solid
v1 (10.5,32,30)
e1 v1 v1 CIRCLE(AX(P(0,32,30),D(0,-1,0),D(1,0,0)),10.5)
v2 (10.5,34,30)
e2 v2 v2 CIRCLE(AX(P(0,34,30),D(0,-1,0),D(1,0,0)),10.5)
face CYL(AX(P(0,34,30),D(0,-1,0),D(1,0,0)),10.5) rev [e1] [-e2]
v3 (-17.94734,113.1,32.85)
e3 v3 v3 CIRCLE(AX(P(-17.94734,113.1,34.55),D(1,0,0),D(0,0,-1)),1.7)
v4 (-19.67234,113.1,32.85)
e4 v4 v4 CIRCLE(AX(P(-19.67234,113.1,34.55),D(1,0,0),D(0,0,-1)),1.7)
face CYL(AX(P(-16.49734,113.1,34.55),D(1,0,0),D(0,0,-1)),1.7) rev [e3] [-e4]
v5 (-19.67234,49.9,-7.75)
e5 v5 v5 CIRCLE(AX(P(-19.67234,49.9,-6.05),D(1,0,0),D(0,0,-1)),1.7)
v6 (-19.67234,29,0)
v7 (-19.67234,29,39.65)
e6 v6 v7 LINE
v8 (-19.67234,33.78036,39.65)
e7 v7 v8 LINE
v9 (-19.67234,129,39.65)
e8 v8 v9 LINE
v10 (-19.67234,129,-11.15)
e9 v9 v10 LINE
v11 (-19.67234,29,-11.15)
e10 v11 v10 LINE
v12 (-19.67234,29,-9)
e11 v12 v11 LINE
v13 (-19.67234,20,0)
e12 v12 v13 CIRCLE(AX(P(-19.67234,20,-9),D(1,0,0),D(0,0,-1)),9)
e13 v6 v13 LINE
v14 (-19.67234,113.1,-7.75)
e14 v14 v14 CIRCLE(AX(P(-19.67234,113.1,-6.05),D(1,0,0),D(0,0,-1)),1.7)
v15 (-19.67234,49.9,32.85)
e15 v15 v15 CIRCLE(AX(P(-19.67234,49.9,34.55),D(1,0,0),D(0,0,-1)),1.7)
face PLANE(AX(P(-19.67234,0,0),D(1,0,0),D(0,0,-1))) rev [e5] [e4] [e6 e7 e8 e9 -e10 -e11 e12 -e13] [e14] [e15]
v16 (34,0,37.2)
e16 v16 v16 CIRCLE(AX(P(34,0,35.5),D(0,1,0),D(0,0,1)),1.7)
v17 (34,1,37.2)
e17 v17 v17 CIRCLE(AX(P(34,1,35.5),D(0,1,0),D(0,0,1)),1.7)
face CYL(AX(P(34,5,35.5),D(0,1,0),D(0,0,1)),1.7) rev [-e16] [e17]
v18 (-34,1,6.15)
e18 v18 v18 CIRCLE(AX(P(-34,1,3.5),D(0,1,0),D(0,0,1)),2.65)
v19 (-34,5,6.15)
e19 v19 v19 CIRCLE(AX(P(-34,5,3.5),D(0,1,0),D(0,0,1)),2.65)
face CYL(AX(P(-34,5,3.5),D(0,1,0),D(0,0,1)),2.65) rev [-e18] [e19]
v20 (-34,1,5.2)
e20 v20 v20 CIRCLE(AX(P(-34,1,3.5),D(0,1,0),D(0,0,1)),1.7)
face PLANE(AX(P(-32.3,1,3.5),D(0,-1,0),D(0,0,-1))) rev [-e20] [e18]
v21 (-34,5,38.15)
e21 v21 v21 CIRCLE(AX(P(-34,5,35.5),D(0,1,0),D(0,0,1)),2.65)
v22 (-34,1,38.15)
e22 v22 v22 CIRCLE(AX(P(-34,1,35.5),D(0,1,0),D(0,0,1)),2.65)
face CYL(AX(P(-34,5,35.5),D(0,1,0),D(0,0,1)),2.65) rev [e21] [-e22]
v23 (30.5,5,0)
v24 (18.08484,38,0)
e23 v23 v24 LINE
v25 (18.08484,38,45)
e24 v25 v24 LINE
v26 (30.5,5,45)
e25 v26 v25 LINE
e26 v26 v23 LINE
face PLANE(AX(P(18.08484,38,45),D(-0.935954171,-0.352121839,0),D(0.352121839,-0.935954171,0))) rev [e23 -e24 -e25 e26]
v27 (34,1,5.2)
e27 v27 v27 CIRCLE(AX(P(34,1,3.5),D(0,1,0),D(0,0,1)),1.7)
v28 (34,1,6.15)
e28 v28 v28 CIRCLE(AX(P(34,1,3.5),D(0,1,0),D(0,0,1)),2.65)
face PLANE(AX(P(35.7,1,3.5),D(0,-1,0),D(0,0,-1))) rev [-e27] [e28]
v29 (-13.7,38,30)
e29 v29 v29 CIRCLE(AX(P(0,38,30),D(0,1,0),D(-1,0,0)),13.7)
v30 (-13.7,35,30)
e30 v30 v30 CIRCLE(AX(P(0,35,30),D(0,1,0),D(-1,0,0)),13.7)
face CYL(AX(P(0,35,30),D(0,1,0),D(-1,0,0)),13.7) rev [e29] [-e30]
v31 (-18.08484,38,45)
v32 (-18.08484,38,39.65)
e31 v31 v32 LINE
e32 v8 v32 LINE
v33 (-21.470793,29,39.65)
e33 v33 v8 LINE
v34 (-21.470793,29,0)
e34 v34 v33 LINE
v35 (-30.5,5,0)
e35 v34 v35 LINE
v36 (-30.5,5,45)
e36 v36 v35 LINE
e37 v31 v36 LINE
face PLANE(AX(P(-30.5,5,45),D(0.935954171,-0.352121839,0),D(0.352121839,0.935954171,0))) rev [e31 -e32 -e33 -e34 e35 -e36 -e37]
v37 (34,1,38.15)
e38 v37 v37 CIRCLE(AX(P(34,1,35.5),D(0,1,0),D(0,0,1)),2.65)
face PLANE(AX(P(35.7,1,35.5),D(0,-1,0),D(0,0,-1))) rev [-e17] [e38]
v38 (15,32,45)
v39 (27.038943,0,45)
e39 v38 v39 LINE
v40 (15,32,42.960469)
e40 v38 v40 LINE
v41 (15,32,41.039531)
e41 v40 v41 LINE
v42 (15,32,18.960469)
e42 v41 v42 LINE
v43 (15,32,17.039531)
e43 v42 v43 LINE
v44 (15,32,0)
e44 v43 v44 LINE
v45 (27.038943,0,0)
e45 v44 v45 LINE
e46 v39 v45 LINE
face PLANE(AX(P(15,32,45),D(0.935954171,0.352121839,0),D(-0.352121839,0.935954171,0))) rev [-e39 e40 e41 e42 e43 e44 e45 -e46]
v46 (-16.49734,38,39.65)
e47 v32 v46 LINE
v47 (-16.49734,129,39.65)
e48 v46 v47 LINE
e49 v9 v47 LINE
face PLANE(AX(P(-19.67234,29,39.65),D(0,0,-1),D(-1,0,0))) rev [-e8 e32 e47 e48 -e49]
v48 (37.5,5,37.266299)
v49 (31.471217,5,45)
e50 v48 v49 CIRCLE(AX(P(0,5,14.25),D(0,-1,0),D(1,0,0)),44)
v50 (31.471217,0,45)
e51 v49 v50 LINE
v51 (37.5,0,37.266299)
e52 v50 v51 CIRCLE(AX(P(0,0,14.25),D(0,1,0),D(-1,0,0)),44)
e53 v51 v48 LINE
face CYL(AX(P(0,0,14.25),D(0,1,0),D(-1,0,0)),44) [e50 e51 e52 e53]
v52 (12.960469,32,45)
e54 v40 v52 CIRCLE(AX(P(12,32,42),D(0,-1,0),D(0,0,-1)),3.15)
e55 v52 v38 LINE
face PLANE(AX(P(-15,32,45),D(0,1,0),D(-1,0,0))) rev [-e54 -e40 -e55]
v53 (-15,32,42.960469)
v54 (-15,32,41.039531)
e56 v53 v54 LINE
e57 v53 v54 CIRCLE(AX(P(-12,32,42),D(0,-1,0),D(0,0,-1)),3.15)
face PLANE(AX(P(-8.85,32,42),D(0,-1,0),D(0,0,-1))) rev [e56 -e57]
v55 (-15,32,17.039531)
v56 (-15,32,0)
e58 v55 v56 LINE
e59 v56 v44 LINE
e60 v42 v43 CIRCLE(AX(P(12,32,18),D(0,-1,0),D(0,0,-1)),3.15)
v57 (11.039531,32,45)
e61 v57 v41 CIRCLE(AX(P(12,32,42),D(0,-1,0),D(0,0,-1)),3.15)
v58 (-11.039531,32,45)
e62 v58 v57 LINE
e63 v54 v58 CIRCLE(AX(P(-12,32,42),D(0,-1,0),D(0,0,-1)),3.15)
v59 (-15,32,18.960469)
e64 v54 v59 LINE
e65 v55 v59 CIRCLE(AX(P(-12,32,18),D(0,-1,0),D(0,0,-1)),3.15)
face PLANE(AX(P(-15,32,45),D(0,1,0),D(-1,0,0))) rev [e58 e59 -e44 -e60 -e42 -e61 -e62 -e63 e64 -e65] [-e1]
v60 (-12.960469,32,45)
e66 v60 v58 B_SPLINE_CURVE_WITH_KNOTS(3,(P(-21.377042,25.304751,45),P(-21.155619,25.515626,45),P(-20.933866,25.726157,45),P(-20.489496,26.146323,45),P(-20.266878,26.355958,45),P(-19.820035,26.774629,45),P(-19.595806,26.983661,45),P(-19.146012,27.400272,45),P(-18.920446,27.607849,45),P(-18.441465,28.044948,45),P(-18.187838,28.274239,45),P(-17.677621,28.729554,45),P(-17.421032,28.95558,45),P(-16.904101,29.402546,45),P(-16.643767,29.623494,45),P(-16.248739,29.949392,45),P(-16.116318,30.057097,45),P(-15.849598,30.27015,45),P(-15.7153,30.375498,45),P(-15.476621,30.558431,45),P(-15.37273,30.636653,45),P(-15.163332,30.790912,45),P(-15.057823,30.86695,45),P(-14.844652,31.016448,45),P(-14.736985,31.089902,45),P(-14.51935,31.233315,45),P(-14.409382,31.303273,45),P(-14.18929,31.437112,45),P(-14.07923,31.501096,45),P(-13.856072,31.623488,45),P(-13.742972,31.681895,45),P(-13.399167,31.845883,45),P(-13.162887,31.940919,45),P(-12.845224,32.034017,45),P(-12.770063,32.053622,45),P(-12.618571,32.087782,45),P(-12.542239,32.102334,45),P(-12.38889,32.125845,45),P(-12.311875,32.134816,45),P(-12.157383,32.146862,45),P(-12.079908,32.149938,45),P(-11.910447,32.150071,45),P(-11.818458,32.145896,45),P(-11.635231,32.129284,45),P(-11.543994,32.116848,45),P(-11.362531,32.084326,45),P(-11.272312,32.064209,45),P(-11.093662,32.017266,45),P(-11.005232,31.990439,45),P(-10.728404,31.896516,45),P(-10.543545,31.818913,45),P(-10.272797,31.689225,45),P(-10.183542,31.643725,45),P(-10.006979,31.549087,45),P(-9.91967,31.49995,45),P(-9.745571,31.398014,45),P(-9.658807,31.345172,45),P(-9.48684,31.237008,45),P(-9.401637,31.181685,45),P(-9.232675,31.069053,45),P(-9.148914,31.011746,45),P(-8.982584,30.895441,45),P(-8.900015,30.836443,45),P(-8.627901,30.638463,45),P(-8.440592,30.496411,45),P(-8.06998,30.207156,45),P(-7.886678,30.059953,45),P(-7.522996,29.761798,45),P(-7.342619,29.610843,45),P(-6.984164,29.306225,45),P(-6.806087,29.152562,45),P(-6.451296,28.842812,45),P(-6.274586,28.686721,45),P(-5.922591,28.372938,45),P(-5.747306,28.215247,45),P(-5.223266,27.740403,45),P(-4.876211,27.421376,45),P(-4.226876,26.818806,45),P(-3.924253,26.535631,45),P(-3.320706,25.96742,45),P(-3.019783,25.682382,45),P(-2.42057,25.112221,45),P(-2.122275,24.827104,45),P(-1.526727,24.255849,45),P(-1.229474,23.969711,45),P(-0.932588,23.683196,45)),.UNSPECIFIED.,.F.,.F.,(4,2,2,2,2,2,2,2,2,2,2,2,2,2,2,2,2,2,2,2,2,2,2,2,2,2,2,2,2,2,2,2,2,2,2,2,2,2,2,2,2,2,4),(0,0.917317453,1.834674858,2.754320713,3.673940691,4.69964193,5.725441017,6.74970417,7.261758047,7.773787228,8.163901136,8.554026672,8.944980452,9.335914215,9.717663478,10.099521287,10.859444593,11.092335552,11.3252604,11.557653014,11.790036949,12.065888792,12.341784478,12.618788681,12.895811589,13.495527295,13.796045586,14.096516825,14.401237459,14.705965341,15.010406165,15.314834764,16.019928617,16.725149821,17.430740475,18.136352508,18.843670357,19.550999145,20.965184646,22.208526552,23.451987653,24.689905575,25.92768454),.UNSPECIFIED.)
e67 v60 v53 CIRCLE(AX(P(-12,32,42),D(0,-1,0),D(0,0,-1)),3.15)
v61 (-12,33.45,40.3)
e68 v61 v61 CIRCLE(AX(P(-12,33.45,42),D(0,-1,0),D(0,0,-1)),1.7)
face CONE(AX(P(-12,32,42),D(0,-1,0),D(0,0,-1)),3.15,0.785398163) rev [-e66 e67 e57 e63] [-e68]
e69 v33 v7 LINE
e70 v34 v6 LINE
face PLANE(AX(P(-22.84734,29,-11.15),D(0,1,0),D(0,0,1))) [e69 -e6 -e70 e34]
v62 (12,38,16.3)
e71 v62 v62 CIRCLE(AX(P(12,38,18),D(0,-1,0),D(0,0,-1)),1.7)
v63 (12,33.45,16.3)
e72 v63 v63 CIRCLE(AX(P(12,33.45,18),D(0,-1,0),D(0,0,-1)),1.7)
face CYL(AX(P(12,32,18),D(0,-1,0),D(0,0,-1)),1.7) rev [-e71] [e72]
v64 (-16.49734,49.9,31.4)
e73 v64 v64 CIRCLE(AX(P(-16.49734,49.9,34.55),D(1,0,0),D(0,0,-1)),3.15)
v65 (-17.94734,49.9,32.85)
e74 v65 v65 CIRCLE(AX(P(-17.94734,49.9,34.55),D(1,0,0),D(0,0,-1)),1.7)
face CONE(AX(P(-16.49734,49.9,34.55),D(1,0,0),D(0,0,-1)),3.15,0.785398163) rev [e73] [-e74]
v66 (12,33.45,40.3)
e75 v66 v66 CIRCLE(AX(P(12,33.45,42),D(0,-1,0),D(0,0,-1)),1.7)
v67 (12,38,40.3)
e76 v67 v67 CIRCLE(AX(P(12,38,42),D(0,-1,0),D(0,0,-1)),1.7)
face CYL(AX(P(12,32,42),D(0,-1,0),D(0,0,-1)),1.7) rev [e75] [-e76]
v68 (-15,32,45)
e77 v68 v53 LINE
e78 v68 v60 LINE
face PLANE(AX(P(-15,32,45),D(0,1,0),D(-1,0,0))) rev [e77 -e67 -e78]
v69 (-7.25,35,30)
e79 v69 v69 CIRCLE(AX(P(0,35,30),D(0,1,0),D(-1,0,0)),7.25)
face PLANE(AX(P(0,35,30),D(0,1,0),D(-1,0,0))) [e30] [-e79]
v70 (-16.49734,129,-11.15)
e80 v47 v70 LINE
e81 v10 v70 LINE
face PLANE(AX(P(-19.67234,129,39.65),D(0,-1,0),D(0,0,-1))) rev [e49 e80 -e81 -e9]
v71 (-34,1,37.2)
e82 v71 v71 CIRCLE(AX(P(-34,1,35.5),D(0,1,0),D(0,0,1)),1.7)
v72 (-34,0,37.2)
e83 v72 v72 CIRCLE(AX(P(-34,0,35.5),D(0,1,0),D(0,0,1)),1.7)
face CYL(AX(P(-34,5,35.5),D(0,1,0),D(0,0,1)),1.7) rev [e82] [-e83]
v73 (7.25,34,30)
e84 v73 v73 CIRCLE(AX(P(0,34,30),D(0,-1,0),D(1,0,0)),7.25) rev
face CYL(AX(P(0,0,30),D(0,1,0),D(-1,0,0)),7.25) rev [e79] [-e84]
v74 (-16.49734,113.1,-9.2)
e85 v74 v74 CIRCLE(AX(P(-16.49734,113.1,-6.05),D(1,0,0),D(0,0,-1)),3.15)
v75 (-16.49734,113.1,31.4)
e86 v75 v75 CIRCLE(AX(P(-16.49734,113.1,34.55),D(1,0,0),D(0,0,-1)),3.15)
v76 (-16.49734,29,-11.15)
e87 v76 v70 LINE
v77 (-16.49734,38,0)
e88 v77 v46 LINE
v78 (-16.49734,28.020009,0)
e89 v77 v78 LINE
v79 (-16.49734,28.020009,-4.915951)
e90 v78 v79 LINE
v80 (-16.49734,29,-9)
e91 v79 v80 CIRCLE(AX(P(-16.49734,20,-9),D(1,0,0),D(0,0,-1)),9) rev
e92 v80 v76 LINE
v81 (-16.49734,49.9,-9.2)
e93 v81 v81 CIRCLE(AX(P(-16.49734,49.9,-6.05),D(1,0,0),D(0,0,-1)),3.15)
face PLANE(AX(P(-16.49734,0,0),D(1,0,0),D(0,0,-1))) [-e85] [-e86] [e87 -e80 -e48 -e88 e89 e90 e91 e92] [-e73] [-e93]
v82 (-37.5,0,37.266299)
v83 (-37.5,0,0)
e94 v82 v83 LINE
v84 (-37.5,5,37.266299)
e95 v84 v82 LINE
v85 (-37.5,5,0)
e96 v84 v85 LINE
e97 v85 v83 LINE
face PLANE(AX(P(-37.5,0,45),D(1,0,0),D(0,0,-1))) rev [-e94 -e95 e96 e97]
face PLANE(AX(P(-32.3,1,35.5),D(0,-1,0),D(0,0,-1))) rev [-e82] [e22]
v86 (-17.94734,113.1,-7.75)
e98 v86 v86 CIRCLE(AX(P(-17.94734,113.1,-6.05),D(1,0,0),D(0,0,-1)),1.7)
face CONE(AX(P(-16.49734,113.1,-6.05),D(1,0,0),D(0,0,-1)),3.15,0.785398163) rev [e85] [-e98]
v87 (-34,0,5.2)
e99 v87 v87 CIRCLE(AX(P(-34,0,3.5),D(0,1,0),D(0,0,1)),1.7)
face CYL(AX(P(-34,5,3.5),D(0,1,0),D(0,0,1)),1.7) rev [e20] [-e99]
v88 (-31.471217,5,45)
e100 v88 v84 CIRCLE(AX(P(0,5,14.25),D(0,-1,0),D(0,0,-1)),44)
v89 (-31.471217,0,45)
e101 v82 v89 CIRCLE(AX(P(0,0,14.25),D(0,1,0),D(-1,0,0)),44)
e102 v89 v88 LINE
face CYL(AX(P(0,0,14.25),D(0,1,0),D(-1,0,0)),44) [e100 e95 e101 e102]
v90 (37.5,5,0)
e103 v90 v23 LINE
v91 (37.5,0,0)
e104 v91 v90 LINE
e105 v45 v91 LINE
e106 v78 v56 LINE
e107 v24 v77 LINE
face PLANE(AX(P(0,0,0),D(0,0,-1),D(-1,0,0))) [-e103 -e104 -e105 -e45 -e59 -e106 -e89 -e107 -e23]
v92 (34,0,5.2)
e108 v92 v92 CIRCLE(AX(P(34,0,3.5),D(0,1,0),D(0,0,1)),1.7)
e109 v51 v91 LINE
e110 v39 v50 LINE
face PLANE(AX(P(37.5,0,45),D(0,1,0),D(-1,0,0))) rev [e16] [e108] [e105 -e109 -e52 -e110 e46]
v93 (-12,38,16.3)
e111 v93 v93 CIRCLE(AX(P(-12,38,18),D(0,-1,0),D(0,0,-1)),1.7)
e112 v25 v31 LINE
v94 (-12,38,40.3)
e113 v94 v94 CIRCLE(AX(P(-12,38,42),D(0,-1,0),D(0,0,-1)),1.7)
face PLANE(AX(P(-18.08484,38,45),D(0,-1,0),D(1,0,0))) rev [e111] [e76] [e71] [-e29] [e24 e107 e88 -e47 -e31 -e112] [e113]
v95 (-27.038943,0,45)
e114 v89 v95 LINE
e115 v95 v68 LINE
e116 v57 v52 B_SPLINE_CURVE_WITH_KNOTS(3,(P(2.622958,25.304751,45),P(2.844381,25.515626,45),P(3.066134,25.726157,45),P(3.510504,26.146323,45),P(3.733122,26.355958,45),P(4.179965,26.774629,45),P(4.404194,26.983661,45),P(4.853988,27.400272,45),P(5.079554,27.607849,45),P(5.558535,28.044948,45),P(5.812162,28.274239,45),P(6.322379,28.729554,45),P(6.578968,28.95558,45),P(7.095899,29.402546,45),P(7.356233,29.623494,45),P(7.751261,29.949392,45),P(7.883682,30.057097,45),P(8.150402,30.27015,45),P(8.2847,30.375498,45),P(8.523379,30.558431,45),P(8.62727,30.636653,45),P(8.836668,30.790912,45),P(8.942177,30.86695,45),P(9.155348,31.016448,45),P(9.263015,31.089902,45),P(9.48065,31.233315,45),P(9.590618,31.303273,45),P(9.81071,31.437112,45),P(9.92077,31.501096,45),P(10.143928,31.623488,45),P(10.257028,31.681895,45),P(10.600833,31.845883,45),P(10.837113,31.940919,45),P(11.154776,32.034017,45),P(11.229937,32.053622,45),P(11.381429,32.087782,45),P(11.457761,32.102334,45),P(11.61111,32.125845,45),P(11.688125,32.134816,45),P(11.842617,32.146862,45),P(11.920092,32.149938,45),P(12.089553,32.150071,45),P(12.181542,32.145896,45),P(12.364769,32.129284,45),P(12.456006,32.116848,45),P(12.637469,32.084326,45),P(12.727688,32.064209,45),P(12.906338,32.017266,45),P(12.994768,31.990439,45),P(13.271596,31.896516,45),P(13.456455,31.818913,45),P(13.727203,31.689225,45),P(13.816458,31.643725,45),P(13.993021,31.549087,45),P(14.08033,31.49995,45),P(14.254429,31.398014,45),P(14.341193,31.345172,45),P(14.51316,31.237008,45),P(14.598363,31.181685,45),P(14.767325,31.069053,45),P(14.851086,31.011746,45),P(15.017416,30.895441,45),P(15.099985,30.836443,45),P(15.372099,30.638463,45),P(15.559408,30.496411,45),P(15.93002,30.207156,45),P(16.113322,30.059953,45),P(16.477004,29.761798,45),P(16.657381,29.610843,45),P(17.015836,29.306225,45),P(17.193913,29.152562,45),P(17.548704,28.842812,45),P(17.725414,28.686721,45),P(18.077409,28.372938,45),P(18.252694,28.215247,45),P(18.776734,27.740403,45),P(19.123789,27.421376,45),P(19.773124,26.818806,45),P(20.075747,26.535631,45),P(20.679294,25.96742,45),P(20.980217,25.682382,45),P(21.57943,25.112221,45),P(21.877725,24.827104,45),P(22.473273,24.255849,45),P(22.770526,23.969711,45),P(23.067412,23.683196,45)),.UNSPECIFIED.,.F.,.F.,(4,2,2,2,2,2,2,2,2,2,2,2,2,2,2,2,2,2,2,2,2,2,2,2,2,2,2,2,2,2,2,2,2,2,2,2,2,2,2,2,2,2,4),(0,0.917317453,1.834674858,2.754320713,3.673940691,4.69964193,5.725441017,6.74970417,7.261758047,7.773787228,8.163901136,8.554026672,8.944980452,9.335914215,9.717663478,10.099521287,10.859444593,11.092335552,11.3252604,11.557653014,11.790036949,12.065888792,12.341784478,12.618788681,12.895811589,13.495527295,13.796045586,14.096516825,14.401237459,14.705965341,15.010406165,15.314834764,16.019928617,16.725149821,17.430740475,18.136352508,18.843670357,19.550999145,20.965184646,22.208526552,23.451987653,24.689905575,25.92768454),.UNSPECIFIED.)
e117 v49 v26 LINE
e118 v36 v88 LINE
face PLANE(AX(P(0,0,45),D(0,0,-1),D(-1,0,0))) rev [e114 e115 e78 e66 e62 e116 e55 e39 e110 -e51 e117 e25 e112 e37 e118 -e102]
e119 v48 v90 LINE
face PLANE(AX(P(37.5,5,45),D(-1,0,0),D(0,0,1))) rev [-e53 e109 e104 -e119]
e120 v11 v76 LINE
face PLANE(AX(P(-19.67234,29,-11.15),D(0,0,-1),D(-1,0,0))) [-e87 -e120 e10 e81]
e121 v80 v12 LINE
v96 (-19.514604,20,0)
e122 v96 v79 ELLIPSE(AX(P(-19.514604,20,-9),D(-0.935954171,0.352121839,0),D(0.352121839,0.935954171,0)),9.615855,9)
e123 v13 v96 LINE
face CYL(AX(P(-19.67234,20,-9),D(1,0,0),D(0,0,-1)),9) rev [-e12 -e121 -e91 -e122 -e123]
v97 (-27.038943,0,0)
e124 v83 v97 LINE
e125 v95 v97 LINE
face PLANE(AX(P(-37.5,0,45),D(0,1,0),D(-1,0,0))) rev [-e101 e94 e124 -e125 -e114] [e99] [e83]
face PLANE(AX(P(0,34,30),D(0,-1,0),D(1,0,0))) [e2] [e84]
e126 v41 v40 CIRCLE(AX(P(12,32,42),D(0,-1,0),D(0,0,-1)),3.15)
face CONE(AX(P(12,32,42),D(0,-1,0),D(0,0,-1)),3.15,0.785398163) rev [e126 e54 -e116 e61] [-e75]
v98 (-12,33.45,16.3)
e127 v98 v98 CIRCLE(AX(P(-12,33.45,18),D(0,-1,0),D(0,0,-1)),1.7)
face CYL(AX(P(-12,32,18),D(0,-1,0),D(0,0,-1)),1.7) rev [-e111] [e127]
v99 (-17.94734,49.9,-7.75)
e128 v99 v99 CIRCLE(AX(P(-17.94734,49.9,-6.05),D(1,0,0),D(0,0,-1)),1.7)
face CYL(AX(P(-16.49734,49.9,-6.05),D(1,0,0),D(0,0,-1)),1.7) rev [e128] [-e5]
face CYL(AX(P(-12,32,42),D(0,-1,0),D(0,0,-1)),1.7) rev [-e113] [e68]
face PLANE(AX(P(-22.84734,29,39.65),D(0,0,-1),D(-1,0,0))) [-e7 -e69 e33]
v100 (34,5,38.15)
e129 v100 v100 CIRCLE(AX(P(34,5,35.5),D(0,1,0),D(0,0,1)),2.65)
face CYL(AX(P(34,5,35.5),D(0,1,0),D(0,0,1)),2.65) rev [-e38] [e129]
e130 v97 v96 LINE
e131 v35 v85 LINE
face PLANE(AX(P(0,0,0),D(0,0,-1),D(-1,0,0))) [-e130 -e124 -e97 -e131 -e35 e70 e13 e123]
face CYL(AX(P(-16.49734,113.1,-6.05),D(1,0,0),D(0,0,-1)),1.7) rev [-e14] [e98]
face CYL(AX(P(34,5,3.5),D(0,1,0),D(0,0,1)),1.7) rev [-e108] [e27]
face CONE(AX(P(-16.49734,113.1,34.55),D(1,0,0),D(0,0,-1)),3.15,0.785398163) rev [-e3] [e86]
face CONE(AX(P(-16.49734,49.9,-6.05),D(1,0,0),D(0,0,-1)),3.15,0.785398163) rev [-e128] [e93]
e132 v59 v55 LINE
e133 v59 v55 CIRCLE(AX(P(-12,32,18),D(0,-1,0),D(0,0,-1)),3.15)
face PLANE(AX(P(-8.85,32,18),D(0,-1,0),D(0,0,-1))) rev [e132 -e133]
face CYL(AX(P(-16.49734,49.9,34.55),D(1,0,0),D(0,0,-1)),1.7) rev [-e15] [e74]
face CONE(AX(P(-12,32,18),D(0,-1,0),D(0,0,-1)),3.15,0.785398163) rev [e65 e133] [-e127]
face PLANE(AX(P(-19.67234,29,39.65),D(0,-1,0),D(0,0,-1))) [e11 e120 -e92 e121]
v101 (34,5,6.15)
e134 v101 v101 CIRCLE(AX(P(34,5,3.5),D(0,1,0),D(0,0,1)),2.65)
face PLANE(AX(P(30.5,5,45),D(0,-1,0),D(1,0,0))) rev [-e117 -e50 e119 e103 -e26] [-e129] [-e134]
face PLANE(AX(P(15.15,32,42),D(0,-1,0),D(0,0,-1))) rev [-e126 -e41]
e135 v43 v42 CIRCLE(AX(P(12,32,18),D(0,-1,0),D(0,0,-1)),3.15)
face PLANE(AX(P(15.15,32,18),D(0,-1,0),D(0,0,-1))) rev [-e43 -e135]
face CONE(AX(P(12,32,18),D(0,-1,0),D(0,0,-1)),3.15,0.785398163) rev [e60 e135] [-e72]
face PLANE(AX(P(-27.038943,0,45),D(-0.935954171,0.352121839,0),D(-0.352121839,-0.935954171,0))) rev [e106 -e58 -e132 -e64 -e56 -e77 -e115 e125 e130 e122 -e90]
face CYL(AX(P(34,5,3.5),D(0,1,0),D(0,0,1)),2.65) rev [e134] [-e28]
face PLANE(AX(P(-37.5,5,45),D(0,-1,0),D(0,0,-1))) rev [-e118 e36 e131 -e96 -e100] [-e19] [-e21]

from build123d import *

# Parameters (mm, degrees)
BOSS_EXTRUDE1_DEPTH                             = 45
SKETCH3_R                                       = 13.7
CUT_EXTRUDE1_DEPTH                              = 3
CSK_FOR_M3_FLAT_HEAD_MACHINE_SCREW4_AT_2_COUNT  = 2
CSK_FOR_M3_FLAT_HEAD_MACHINE_SCREW4_AT_2_PITCH  = 24
CSK_FOR_M3_FLAT_HEAD_MACHINE_SCREW4_AT_3_COUNT  = 2
CSK_FOR_M3_FLAT_HEAD_MACHINE_SCREW4_AT_3_PITCH  = 33.941125497
CSK_FOR_M3_FLAT_HEAD_MACHINE_SCREW4_AT_4_COUNT  = 2
CSK_FOR_M3_FLAT_HEAD_MACHINE_SCREW4_AT_4_PITCH  = 24
SKETCH10_R                                      = 7.25
CUT_EXTRUDE2_DEPTH                              = 69.23672032
SKETCH15_R                                      = 48.495489481
SKETCH15_R_2                                    = 44
CUT_EXTRUDE4_DEPTH                              = 70.822990483
SKETCH11_R                                      = 10.5
CUT_EXTRUDE3_DEPTH                              = 2
CBORE_FOR_M5_HEX_HEAD_BOLT1_D                   = 3.4
CBORE_FOR_M5_HEX_HEAD_BOLT1_CBORE_D             = 5.3
CBORE_FOR_M5_HEX_HEAD_BOLT1_CBORE_DEPTH         = 4
BOSS_EXTRUDE6_DEPTH                             = 1.5875
BOSS_EXTRUDE6_DEPTH_BACK                        = 1.5875
SKETCH28_W                                      = 50.8
SKETCH28_H                                      = 100
FILLET4_R                                       = 9
CSK_FOR_M3_FLAT_HEAD_MACHINE_SCREW3_D           = 3.4
CSK_FOR_M3_FLAT_HEAD_MACHINE_SCREW3_CSINK_D     = 6.3
CSK_FOR_M3_FLAT_HEAD_MACHINE_SCREW3_CSINK_ANGLE = 90
SKETCH32_W                                      = 50.8
SKETCH32_H                                      = 4.780360426
CUT_EXTRUDE5_DEPTH                              = 3.175


with BuildPart() as part:
    # Sketch1 → Boss-Extrude1 (new body)
    with BuildSketch(Plane.XY):
        Polygon((-37.5, 0), (-27.038942926, 0), (-15, 32), (15, 32), (27.038942926, 0), (37.5, 0), (37.5, 5), (30.5, 5), (18.084840108, 38), (-18.084840108, 38), (-30.5, 5), (-37.5, 5), align=None)
    extrude(amount=BOSS_EXTRUDE1_DEPTH)

    # Sketch3 → Cut-Extrude1 (cut)
    with BuildSketch(Plane(origin=(0, 38, 0), x_dir=(1, 0, 0), z_dir=(0, 1, 0))):
        with Locations(Location((0, -30, 0), (0, 0, 180))):
            Circle(SKETCH3_R)
    extrude(amount=-CUT_EXTRUDE1_DEPTH, mode=Mode.SUBTRACT)

    # Sketch6 → CSK for M3 Flat Head Machine Screw4 (revolve, cut)
    with BuildSketch(Plane(origin=(-12, 32, 42), x_dir=(0, 0, -1), z_dir=(1, 0, 0))):
        Polygon((0, 0), (0, 6), (1.7, 6), (1.7, 1.45), (3.15, 0), align=None)
    csk_for_m3_flat_head_machine_screw4 = revolve(axis=Axis((-12, 25.65, 42), (0, 1, 0)), mode=Mode.SUBTRACT)

    # CSK for M3 Flat Head Machine Screw4 at 2: CSK for M3 Flat Head Machine Screw4 ×2
    with Locations(*[(i * CSK_FOR_M3_FLAT_HEAD_MACHINE_SCREW4_AT_2_PITCH, 0, 0) for i in range(1, CSK_FOR_M3_FLAT_HEAD_MACHINE_SCREW4_AT_2_COUNT)]):
        add(csk_for_m3_flat_head_machine_screw4, mode=Mode.SUBTRACT)

    # CSK for M3 Flat Head Machine Screw4 at 3: CSK for M3 Flat Head Machine Screw4 ×2
    with Locations(*[Vector(0.7071067811865476, 0, -0.7071067811865475) * (i * CSK_FOR_M3_FLAT_HEAD_MACHINE_SCREW4_AT_3_PITCH) for i in range(1, CSK_FOR_M3_FLAT_HEAD_MACHINE_SCREW4_AT_3_COUNT)]):
        add(csk_for_m3_flat_head_machine_screw4, mode=Mode.SUBTRACT)

    # CSK for M3 Flat Head Machine Screw4 at 4: CSK for M3 Flat Head Machine Screw4 ×2
    with Locations(*[(0, 0, -i * CSK_FOR_M3_FLAT_HEAD_MACHINE_SCREW4_AT_4_PITCH) for i in range(1, CSK_FOR_M3_FLAT_HEAD_MACHINE_SCREW4_AT_4_COUNT)]):
        add(csk_for_m3_flat_head_machine_screw4, mode=Mode.SUBTRACT)

    # Sketch10 → Cut-Extrude2 (cut, through all)
    with BuildSketch(Plane(origin=(0, 35, 0), x_dir=(1, 0, 0), z_dir=(0, 1, 0))):
        with Locations(Location((0, -30, 0), (0, 0, 180))):
            Circle(SKETCH10_R)
    extrude(amount=-CUT_EXTRUDE2_DEPTH, mode=Mode.SUBTRACT)

    # Sketch15 → Cut-Extrude4 (cut, through all)
    with BuildSketch(Plane(origin=(0, 38, 0), x_dir=(1, 0, 0), z_dir=(0, 1, 0))):
        with Locations((0, -14.25)):
            Circle(SKETCH15_R)
        with Locations((0, -14.25)):
            Circle(SKETCH15_R_2, mode=Mode.SUBTRACT)
    extrude(amount=-CUT_EXTRUDE4_DEPTH, mode=Mode.SUBTRACT)

    # Sketch11 → Cut-Extrude3 (cut)
    with BuildSketch(Plane.XZ.offset(-32)):
        with Locations((0, 30)):
            Circle(SKETCH11_R)
    extrude(amount=-CUT_EXTRUDE3_DEPTH, mode=Mode.SUBTRACT)

    # CBORE for M5 Hex Head Bolt1 (through all)
    with Locations(Plane(origin=(0, 5, 0), x_dir=(-1, 0, 0), z_dir=(0, 1, 0))):
        with Locations((34, 35.5), (34, 3.5), (-34, 3.5), (-34, 35.5)):
            CounterBoreHole(CBORE_FOR_M5_HEX_HEAD_BOLT1_D / 2, CBORE_FOR_M5_HEX_HEAD_BOLT1_CBORE_D / 2, CBORE_FOR_M5_HEX_HEAD_BOLT1_CBORE_DEPTH)

    # Sketch28 → Boss-Extrude6 (add, two sides: drawn at the far end of the back side and taken through both)
    with BuildSketch(Plane(origin=(-18.084840108, 0, 0), x_dir=(0, 0, -1), z_dir=(1, 0, 0)).offset(-BOSS_EXTRUDE6_DEPTH_BACK)):
        with Locations((-14.25, 79)):
            Rectangle(SKETCH28_W, SKETCH28_H)
    extrude(amount=BOSS_EXTRUDE6_DEPTH + BOSS_EXTRUDE6_DEPTH_BACK)

    # Fillet4
    # the kernel refuses this fillet: 9 mm, written as the material it adds along each edge
    with BuildSketch(Plane(origin=(-16.497340108, 29, 0), x_dir=(0, -1, 0), z_dir=(-1, 0, 0))) as fillet4_piece_1_section:
        with BuildLine():
            CenterArc((FILLET4_R, -FILLET4_R), FILLET4_R, 90, 90)
            Line((0, -FILLET4_R), (0, 0))
            Line((0, 0), (FILLET4_R, 0))
        make_face()
    fillet4_piece_1 = extrude(amount=3.175, mode=Mode.PRIVATE)
    fillet4_piece_1 = split(fillet4_piece_1, bisect_by=Plane(origin=(-16.91095331, 26.920608371, -2.290762679), z_dir=(-0.9359541711547182, 0.35212183899622657, 0)), keep=Keep.TOP, mode=Mode.PRIVATE)
    add(fillet4_piece_1)

    # CSK for M3 Flat Head Machine Screw3 (through all)
    with Locations(Plane(origin=(-16.497340108, 0, 0), x_dir=(0, 0, -1), z_dir=(1, 0, 0))):
        with Locations((6.05, 49.9), (-34.55, 49.9), (-34.55, 113.1), (6.05, 113.1)):
            CounterSinkHole(CSK_FOR_M3_FLAT_HEAD_MACHINE_SCREW3_D / 2, CSK_FOR_M3_FLAT_HEAD_MACHINE_SCREW3_CSINK_D / 2, counter_sink_angle=CSK_FOR_M3_FLAT_HEAD_MACHINE_SCREW3_CSINK_ANGLE)

    # Sketch32 → Cut-Extrude5 (cut)
    with BuildSketch(Plane.ZY.offset(19.672340108)):
        with Locations((14.25, 31.390180213)):
            Rectangle(SKETCH32_W, SKETCH32_H)
    extrude(amount=CUT_EXTRUDE5_DEPTH, mode=Mode.SUBTRACT)


solid = part.part
